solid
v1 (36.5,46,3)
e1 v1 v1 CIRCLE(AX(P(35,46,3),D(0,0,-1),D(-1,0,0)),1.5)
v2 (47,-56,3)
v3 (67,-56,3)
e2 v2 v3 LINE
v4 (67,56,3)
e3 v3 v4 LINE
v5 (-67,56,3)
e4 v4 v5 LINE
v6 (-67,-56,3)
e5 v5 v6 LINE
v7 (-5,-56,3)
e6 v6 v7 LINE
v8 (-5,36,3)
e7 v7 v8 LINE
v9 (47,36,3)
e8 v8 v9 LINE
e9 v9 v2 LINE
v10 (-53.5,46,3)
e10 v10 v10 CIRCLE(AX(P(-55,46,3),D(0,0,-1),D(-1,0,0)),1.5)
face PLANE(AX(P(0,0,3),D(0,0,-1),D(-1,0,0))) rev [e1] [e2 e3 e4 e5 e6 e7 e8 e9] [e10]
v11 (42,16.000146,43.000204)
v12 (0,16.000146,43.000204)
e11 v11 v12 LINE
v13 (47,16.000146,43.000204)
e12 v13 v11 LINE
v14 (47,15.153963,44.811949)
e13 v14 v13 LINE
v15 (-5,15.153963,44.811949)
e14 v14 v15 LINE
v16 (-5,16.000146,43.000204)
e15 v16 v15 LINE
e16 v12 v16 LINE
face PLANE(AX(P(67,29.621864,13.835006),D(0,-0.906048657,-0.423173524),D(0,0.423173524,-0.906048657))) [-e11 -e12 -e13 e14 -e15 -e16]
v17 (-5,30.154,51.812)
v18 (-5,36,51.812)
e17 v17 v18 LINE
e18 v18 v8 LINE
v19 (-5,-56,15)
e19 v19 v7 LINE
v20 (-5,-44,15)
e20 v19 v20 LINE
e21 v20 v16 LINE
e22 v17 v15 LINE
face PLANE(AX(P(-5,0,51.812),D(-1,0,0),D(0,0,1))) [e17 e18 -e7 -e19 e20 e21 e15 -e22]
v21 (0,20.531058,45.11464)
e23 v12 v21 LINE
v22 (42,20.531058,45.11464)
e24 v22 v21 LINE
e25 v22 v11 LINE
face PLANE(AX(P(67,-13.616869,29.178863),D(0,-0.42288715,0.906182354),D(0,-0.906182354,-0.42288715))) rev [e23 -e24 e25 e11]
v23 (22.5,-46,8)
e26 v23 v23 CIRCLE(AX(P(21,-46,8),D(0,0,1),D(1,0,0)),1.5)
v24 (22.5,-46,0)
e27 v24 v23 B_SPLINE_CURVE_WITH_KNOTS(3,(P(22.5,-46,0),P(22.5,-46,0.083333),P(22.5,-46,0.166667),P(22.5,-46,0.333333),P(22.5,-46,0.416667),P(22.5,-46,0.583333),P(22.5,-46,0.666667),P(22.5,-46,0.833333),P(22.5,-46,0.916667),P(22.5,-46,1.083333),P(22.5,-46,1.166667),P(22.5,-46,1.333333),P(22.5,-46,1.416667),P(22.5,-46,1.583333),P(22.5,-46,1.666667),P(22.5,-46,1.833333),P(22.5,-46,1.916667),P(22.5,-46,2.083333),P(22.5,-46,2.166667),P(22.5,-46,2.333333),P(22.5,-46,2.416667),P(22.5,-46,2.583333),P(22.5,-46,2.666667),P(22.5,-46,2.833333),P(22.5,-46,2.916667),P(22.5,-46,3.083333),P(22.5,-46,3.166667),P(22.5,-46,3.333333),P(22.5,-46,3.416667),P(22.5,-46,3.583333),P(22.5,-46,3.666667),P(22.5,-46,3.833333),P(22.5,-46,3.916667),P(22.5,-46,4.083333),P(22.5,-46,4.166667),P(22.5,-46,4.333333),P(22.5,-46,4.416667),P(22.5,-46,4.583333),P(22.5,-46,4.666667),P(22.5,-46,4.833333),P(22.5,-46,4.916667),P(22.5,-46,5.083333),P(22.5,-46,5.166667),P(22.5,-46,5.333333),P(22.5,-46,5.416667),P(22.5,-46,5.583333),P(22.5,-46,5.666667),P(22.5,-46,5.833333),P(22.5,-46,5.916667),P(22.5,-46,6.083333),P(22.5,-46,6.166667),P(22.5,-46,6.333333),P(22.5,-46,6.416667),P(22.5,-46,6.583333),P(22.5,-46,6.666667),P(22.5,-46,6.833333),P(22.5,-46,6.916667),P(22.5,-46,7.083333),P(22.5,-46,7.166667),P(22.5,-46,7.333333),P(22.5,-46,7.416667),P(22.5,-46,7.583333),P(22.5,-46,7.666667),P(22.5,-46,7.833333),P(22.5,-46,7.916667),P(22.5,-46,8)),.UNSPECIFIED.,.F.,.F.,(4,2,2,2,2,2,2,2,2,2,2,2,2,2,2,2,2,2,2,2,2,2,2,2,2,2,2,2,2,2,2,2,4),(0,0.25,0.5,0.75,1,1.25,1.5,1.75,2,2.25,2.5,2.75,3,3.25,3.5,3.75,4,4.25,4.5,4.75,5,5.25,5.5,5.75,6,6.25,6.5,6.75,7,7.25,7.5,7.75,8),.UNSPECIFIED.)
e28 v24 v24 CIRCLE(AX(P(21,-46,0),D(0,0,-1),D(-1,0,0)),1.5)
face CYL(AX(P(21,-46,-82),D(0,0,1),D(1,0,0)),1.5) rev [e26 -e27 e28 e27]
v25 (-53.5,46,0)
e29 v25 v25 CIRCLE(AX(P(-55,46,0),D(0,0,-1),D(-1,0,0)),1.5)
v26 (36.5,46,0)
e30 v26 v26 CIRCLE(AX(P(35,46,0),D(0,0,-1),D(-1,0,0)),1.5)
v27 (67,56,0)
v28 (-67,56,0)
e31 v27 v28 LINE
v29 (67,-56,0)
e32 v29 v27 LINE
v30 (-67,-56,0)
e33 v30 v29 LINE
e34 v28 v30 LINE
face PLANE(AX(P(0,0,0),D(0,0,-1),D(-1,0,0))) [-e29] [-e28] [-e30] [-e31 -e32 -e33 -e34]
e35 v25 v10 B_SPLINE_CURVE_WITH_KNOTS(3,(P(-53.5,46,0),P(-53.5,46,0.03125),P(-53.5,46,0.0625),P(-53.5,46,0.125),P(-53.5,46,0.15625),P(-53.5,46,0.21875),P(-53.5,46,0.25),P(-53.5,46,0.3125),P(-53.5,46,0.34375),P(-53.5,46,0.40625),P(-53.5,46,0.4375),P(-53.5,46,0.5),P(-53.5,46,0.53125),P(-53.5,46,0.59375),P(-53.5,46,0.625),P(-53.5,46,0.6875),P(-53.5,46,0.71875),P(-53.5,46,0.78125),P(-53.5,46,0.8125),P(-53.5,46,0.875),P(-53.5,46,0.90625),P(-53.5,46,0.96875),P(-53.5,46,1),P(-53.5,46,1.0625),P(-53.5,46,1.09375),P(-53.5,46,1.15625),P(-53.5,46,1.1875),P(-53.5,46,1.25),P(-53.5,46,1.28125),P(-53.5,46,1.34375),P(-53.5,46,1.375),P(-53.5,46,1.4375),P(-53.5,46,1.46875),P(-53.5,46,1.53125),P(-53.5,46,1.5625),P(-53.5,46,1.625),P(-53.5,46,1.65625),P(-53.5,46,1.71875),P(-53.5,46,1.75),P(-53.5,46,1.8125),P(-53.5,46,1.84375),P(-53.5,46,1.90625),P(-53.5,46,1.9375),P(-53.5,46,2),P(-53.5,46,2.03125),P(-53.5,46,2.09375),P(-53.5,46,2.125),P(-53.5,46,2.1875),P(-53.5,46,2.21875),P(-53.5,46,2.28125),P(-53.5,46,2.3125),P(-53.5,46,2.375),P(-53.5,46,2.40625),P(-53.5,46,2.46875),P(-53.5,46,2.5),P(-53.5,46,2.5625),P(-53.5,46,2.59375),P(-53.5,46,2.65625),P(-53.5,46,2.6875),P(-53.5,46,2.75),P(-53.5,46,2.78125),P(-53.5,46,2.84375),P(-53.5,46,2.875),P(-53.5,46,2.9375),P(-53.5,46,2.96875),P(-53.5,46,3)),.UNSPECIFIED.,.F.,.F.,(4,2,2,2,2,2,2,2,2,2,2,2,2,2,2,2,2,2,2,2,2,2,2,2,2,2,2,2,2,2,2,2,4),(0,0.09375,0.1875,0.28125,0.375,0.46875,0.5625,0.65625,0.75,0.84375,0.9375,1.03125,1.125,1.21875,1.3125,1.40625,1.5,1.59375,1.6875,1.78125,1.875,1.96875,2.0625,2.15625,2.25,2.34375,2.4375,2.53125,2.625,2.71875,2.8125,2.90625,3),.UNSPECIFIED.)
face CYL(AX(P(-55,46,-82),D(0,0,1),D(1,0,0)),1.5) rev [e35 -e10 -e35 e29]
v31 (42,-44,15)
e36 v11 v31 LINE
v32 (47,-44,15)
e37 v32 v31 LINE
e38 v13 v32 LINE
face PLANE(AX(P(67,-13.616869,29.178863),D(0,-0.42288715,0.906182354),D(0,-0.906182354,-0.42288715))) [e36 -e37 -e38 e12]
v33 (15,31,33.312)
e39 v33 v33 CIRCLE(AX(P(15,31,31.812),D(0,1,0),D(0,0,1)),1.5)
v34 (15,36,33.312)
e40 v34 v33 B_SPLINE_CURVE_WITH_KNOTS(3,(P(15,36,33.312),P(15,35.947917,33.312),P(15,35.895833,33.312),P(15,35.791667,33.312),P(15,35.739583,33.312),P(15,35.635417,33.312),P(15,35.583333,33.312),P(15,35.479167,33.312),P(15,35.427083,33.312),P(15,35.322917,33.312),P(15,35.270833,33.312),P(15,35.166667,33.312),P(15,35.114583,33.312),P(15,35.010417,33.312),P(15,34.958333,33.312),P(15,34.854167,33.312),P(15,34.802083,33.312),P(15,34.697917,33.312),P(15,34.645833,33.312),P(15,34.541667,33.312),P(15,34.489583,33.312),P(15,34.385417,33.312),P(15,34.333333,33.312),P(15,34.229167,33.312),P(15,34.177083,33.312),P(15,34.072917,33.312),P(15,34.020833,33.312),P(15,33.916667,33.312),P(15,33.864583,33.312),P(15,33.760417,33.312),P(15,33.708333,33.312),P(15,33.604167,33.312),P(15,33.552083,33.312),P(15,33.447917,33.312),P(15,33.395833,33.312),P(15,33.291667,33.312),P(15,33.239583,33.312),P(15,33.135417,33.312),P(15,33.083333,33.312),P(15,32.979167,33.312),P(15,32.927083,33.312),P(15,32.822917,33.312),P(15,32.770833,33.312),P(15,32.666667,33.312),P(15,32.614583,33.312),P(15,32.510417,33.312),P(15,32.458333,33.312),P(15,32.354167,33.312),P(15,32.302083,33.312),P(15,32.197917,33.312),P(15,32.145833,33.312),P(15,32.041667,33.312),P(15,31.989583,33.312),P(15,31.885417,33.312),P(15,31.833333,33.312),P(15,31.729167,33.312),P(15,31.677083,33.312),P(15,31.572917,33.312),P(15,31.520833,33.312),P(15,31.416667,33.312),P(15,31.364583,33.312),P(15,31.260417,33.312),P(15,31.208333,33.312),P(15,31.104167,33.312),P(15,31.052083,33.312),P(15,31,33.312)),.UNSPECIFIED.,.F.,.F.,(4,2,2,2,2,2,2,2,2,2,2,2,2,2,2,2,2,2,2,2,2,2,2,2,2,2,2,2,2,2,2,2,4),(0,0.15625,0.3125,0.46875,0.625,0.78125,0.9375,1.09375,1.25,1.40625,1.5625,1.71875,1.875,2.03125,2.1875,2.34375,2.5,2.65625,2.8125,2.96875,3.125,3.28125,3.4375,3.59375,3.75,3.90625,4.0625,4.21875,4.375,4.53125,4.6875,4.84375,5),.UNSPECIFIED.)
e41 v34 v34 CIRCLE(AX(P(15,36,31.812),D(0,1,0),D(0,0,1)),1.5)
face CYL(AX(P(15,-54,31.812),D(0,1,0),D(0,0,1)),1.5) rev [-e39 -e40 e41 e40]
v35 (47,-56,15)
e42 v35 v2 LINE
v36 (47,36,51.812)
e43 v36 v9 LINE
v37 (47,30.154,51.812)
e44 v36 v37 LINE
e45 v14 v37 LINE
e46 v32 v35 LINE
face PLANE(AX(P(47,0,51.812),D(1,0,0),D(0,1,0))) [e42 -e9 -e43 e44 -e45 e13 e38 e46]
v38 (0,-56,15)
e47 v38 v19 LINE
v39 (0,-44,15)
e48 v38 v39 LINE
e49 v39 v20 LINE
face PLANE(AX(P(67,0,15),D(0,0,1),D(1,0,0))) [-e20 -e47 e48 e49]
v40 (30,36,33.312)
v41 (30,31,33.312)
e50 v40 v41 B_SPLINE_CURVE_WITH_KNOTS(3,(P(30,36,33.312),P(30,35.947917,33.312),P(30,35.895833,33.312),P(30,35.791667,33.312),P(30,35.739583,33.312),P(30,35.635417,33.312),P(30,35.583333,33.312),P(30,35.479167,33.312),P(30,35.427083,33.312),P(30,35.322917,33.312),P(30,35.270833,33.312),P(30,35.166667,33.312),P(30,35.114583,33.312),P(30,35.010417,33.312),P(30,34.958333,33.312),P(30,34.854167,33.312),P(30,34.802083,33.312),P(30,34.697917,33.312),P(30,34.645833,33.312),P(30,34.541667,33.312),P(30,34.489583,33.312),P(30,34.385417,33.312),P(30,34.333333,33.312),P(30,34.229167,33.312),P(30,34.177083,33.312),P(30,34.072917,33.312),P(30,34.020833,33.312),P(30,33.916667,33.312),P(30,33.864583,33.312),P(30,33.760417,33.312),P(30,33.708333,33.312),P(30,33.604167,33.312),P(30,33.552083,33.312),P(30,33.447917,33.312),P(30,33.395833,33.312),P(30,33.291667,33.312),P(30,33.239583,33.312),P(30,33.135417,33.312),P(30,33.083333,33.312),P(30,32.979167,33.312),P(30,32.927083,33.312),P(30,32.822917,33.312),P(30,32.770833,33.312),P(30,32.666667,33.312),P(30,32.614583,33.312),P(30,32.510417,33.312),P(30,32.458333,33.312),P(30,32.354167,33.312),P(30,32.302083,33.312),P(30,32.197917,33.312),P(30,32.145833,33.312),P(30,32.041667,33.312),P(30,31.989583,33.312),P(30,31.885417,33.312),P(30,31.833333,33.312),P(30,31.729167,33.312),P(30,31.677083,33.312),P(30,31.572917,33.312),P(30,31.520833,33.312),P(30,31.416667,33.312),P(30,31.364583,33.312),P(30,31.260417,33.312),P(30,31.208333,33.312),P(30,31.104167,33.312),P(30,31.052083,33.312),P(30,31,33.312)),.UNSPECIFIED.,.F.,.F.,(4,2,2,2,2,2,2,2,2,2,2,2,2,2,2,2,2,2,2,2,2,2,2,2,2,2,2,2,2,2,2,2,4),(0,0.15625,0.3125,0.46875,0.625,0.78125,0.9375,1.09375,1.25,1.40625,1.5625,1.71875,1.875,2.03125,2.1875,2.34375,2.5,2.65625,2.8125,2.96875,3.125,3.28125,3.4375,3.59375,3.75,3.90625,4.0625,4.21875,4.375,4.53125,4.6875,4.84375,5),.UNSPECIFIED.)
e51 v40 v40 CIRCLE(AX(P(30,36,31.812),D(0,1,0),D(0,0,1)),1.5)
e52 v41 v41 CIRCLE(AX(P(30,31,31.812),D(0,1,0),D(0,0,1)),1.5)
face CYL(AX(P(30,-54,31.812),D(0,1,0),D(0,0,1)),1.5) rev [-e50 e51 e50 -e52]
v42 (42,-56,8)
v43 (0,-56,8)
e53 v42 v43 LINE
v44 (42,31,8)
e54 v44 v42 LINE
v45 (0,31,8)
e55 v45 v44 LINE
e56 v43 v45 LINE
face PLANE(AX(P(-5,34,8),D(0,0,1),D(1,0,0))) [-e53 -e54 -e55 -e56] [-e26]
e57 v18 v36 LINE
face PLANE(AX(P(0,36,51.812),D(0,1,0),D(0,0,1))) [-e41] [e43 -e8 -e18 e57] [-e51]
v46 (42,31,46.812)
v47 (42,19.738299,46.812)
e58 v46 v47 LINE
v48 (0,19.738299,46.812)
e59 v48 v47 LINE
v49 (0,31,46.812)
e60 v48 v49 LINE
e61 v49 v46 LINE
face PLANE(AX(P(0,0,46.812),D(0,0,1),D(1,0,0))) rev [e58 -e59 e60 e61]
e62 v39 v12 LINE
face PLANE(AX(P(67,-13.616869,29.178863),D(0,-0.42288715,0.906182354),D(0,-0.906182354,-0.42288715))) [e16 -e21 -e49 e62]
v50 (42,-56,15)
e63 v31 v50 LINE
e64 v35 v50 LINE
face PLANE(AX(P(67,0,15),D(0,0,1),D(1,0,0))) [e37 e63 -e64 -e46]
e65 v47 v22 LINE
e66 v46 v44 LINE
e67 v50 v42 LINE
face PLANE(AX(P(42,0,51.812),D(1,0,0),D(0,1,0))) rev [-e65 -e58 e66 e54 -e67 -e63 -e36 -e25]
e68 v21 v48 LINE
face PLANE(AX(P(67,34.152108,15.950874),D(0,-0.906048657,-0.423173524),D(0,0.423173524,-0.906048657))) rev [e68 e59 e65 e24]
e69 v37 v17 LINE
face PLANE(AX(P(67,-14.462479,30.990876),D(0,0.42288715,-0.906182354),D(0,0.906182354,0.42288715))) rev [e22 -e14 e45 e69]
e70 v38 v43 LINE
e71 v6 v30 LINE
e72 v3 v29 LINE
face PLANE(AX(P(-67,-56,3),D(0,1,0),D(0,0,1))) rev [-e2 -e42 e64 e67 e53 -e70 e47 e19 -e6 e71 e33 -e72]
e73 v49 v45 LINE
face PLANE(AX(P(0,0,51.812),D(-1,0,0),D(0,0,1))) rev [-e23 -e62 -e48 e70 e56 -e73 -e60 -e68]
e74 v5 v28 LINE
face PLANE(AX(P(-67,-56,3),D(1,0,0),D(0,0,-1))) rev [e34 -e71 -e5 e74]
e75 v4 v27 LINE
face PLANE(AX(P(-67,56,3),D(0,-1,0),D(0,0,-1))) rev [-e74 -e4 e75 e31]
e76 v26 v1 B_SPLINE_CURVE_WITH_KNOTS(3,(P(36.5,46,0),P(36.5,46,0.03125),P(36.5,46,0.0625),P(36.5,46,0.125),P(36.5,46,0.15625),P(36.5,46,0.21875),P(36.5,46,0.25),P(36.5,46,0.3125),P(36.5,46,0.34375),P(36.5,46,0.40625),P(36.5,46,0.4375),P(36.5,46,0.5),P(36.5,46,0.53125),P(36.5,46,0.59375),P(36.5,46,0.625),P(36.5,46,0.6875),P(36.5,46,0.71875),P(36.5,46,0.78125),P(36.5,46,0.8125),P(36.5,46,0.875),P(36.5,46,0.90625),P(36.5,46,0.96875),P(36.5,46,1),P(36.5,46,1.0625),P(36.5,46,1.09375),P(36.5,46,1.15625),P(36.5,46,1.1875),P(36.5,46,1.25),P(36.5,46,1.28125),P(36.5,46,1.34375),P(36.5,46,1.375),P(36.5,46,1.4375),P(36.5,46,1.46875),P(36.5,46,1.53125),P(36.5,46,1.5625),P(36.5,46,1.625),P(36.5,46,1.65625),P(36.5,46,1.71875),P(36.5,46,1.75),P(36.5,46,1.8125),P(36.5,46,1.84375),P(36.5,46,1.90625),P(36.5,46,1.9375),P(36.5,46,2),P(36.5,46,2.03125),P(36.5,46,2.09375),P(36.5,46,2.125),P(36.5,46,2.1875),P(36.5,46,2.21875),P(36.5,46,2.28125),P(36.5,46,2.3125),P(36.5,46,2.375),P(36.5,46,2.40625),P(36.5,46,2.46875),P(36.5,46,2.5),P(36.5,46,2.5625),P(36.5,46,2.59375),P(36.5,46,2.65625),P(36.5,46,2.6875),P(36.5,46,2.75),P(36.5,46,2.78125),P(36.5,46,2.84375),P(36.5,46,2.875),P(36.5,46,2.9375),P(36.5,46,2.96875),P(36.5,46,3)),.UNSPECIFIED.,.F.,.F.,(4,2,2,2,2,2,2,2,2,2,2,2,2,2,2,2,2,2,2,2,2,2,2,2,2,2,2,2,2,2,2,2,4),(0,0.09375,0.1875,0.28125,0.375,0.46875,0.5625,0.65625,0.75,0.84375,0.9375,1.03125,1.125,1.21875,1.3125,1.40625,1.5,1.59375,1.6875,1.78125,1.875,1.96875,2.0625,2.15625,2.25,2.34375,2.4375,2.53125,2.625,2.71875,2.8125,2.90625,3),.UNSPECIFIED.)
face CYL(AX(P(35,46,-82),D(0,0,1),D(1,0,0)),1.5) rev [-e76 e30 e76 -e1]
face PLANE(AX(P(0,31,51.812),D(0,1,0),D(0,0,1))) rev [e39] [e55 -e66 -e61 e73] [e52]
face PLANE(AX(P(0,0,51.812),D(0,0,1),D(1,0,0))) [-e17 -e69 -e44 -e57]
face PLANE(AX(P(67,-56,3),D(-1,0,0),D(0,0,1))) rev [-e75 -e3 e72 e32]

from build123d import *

# Parameters (mm, degrees)
CROQUIS1_W              = 134
CROQUIS1_H              = 112
SALIENTE_EXTRUIR1_DEPTH = 3
CROQUIS2_W              = 52
CROQUIS2_H              = 92
SALIENTE_EXTRUIR2_DEPTH = 48.812
CORTAR_EXTRUIR1_DEPTH   = 105.902256144
VACIADO1_DEPTH          = 42
CROQUIS4_W              = 52
CROQUIS4_H              = 5
SALIENTE_EXTRUIR3_DEPTH = 90
CROQUIS5_R              = 1.5
CORTAR_EXTRUIR2_DEPTH   = 90
CROQUIS6_R              = 1.5
CORTAR_EXTRUIR3_DEPTH   = 90


# Read off the part's stored shape, not the designer's step: Vaciado1
with BuildPart() as part:
    # Croquis1 → Saliente-Extruir1 (new body)
    with BuildSketch(Plane.XY):
        Rectangle(CROQUIS1_W, CROQUIS1_H)
    extrude(amount=SALIENTE_EXTRUIR1_DEPTH)

    # Croquis2 → Saliente-Extruir2 (add)
    with BuildSketch(Plane.XY.offset(3)):
        with Locations((21, -10)):
            Rectangle(CROQUIS2_W, CROQUIS2_H)
    extrude(amount=SALIENTE_EXTRUIR2_DEPTH)

    # Croquis3 → Cortar-Extruir1 (cut, through all)
    with BuildSketch(Plane.ZY.offset(5)):
        Polygon((51.812, -56), (51.812, 30.154), (44.811949005, 15.153963498), (43.00020398, 16.000146009), (15, -44), (15, -56), align=None)
    extrude(amount=-CORTAR_EXTRUIR1_DEPTH, mode=Mode.SUBTRACT)

    # Vaciado1 outline → Vaciado1 (cut)
    with BuildSketch(Plane.YZ):
        Polygon((-56, 5), (31, 5), (31, 46.812), (19.738299384, 46.812), (20.531058004, 45.114639836), (16.000146009, 43.00020398), (-44, 15), (-56, 15), align=None)
    extrude(amount=VACIADO1_DEPTH, mode=Mode.SUBTRACT)

    # Croquis4 → Saliente-Extruir3 (add)
    with BuildSketch(Plane.XZ.offset(56)):
        with Locations((21, 5.5)):
            Rectangle(CROQUIS4_W, CROQUIS4_H)
    extrude(amount=-SALIENTE_EXTRUIR3_DEPTH)

    # Croquis5 → Cortar-Extruir2 (cut)
    with BuildSketch(Plane.XY.offset(8)):
        with Locations((21, -46)):
            Circle(CROQUIS5_R)
        with Locations((-55, 46)):
            Circle(CROQUIS5_R)
        with Locations((35, 46)):
            Circle(CROQUIS5_R)
    extrude(amount=-CORTAR_EXTRUIR2_DEPTH, mode=Mode.SUBTRACT)

    # Croquis6 → Cortar-Extruir3 (cut)
    with BuildSketch(Plane(origin=(0, 36, 0), x_dir=(1, 0, 0), z_dir=(0, 1, 0))):
        with Locations(Location((30, -31.812, 0), (0, 0, 270))):
            Circle(CROQUIS6_R)
        with Locations(Location((15, -31.812, 0), (0, 0, 270))):
            Circle(CROQUIS6_R)
    extrude(amount=-CORTAR_EXTRUIR3_DEPTH, mode=Mode.SUBTRACT)


solid = part.part
